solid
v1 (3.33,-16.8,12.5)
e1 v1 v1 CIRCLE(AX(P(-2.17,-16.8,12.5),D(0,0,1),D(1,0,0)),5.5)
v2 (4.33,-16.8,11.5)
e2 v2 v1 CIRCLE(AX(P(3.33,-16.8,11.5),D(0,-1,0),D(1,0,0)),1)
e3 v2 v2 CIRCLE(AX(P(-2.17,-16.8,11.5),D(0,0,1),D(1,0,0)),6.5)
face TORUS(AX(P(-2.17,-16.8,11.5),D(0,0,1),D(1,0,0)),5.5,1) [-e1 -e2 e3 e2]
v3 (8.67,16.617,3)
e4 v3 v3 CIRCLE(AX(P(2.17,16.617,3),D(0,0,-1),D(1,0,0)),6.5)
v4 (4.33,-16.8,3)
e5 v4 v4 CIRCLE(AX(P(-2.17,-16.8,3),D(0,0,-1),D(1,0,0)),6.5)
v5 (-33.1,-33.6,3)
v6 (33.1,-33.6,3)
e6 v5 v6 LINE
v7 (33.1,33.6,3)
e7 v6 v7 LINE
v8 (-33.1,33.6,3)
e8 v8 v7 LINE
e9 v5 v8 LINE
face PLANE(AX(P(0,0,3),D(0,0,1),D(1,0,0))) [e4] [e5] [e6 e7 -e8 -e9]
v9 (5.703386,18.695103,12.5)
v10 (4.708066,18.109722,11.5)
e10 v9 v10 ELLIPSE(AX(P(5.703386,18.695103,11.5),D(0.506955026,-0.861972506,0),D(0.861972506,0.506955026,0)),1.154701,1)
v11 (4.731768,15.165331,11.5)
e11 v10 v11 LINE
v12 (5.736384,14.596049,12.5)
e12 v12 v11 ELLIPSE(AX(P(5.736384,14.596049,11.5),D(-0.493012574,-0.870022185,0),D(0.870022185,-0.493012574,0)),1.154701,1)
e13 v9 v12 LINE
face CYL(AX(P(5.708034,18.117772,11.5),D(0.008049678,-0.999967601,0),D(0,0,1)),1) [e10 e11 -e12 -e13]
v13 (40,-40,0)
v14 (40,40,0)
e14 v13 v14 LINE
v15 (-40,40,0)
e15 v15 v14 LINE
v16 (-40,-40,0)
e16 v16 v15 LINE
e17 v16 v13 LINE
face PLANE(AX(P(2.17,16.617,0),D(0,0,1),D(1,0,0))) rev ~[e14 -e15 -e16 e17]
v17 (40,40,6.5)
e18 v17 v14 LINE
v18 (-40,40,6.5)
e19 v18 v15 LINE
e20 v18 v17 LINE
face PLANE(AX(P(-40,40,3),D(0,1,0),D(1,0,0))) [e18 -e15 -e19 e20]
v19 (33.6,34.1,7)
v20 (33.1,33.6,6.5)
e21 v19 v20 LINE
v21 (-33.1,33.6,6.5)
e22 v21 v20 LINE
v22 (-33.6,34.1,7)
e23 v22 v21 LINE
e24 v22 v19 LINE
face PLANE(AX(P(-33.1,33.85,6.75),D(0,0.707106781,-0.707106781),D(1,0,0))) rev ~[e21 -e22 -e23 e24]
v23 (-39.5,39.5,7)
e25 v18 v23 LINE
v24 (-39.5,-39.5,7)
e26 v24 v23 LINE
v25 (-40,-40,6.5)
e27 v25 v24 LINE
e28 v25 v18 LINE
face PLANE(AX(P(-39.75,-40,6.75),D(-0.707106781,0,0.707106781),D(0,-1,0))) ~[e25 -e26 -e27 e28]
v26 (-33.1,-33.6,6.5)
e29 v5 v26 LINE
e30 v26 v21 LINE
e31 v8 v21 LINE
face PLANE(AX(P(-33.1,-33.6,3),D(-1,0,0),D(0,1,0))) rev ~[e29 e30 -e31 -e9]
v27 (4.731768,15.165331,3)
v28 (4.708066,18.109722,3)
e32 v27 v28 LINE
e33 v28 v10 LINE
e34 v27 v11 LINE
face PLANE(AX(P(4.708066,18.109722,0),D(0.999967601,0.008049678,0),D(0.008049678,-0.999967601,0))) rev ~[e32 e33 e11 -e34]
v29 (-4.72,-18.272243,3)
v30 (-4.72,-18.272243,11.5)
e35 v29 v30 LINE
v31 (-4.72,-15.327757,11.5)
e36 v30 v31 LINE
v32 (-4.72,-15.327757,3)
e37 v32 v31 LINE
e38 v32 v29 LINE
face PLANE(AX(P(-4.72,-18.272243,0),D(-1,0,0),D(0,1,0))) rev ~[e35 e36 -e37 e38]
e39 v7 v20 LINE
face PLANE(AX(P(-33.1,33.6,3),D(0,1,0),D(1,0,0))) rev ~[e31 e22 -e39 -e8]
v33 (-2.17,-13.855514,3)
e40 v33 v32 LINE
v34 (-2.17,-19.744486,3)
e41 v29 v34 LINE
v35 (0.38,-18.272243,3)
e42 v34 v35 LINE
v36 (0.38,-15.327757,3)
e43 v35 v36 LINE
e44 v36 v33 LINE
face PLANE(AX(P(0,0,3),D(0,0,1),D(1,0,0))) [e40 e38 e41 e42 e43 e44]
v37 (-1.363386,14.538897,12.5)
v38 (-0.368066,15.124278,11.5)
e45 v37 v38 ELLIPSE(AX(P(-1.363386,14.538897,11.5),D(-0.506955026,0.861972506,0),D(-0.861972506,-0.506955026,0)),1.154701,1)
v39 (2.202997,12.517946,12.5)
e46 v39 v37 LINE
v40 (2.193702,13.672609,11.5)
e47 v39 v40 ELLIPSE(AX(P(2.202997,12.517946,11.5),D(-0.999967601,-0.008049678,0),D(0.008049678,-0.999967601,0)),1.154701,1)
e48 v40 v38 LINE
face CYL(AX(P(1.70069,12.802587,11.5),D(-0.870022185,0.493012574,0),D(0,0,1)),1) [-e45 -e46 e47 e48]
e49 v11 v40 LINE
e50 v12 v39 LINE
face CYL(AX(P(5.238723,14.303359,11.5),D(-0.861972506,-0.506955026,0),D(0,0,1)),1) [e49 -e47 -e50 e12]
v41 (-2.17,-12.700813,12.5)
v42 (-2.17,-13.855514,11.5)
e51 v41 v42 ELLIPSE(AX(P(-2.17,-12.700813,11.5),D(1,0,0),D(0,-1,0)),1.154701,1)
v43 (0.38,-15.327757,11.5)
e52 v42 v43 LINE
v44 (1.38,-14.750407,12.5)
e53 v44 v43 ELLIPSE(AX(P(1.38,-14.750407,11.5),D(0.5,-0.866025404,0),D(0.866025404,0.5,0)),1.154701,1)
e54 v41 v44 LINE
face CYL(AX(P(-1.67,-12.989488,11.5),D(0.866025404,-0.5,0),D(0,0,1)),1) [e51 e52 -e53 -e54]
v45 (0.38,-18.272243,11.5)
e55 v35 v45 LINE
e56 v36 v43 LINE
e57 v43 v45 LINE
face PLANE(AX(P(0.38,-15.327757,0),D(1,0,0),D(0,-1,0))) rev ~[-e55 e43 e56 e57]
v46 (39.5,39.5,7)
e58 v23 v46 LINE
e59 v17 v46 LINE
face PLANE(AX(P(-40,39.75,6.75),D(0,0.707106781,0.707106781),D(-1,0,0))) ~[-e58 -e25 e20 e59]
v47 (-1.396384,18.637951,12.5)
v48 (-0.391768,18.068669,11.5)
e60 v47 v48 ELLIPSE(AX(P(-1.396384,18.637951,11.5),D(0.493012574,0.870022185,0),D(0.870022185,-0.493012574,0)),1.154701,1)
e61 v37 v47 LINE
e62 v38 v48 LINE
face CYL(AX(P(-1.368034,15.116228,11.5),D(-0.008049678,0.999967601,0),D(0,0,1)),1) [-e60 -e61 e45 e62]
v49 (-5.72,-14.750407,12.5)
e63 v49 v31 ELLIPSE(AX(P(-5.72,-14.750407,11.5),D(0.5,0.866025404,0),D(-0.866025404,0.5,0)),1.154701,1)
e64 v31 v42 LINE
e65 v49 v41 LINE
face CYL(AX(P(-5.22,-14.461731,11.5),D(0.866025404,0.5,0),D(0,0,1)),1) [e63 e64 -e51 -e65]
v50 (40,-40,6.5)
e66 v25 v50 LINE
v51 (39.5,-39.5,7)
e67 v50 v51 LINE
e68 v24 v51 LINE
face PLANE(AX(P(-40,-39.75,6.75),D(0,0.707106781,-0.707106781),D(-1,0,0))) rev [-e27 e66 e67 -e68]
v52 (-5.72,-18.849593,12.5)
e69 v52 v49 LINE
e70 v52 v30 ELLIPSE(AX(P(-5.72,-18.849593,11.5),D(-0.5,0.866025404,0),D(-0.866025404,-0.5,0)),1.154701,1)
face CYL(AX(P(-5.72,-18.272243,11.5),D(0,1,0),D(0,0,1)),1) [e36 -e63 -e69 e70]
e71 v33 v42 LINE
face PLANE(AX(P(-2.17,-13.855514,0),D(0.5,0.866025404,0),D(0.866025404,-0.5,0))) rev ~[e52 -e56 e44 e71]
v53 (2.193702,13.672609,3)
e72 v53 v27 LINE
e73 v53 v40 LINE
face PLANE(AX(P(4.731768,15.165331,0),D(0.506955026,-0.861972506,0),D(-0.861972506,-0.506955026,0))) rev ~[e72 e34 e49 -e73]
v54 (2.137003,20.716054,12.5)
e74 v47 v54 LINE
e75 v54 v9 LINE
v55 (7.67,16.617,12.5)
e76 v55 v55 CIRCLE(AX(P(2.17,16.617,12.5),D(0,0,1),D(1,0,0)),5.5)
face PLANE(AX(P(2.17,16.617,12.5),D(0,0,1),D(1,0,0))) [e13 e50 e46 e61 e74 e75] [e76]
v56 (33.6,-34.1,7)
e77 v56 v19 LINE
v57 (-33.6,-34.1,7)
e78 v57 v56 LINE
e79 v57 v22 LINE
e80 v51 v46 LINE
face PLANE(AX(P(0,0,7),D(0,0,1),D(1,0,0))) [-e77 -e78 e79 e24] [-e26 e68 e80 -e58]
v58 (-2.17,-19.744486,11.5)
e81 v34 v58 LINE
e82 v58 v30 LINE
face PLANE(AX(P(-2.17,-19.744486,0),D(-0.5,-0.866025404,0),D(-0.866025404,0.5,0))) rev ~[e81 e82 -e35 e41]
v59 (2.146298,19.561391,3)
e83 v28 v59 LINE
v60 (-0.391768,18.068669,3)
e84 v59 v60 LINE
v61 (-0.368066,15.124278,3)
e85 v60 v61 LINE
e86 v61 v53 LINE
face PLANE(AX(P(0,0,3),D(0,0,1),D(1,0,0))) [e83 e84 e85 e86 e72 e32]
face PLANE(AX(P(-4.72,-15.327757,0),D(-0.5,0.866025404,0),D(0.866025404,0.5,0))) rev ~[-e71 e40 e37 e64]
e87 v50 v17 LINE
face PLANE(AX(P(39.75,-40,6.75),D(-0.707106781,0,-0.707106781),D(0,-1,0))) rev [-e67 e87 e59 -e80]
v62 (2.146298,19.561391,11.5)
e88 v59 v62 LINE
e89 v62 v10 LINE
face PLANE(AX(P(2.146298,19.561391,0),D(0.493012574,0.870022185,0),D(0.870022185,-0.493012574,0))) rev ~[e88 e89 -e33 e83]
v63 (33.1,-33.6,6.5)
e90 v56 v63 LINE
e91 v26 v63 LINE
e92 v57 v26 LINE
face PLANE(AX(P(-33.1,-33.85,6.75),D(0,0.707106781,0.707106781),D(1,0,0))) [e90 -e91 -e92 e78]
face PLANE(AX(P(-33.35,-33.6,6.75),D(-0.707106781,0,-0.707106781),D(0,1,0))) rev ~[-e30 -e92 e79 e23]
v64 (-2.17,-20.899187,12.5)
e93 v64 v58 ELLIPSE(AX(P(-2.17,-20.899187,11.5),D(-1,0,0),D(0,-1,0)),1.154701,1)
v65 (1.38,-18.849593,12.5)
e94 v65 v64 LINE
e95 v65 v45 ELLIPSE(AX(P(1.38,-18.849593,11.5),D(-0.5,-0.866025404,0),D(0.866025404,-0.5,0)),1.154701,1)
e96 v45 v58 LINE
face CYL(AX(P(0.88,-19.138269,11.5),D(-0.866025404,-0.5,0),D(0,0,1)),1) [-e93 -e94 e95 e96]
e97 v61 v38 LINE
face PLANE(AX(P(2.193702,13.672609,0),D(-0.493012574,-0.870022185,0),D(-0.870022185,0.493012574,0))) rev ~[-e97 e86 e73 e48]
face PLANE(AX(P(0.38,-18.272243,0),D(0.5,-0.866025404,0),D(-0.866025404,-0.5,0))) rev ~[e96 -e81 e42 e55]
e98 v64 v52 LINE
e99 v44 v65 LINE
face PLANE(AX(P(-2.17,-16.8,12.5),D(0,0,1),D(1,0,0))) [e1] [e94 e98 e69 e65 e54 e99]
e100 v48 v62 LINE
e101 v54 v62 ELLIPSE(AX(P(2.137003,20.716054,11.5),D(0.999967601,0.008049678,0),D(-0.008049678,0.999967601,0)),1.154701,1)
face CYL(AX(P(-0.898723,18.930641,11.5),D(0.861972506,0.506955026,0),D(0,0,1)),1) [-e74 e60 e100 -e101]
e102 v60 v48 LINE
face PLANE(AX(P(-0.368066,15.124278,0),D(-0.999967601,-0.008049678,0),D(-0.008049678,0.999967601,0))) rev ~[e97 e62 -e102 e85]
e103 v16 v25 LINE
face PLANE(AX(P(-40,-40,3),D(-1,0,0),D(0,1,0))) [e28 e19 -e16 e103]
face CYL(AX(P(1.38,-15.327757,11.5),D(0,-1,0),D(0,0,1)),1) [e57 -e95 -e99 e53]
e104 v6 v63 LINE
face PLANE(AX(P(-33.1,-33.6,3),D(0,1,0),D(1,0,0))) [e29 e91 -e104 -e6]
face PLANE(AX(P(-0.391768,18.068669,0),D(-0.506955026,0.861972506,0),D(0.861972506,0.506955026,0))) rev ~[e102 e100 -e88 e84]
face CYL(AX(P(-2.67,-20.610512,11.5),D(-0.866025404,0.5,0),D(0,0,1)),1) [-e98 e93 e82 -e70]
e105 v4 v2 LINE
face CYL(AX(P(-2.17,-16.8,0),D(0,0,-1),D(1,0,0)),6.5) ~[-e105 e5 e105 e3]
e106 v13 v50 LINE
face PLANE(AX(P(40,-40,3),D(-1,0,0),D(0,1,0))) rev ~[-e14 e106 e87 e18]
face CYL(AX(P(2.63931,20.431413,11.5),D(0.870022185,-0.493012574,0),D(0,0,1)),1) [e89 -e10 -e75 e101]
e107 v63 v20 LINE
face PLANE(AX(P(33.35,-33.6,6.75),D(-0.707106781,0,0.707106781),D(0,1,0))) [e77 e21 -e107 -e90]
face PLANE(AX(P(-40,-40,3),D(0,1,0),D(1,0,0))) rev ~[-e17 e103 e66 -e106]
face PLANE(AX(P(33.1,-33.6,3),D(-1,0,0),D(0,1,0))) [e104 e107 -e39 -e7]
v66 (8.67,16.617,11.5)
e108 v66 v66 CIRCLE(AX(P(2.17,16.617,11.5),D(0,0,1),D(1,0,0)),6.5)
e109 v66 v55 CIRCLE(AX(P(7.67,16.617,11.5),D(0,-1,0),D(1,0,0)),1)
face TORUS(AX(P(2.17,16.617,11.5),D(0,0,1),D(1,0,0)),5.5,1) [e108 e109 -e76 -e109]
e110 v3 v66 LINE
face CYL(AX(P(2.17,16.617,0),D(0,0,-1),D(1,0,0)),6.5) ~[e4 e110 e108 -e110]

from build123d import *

# Parameters (mm, degrees)
F0_W     = 80
F0_H     = 80
F0_R     = 6.5
F1_DEPTH = 3
F2_DEPTH = 12.5
F3_R     = 1
F4_W     = 80
F4_H     = 80
F4_W_2   = 66.2
F4_H_2   = 67.2
F5_DEPTH = 4
F6_SIZE  = 0.5


# Not quite as in the source:
# - a feature names something its author has since deleted; it is built from what else it names


with BuildPart() as f1:
    # F0 (on Top) → F1 (new body)
    with BuildSketch(Plane.XY):
        Rectangle(F0_W, F0_H)
        with Locations((-2.17, -16.8)):
            Circle(F0_R, mode=Mode.SUBTRACT)
        with Locations((2.17, 16.617)):
            Circle(F0_R, mode=Mode.SUBTRACT)
        with Locations((2.17, 16.617)):
            Circle(F0_R)
        Polygon((-0.3917684664, 18.0686688068), (2.1462978314, 19.5613909739), (4.7080662978, 18.1097221671), (4.7317684664, 15.1653311932), (2.1937021686, 13.6726090261), (-0.3680662978, 15.1242778329), align=None, mode=Mode.SUBTRACT)
        Polygon((4.7080662978, 18.1097221671), (2.1462978314, 19.5613909739), (-0.3917684664, 18.0686688068), (-0.3680662978, 15.1242778329), (2.1937021686, 13.6726090261), (4.7317684664, 15.1653311932), align=None)
        with Locations((-2.17, -16.8)):
            Circle(F0_R)
        Polygon((-2.17, -13.8555136271), (0.38, -15.3277568136), (0.38, -18.2722431864), (-2.17, -19.7444863729), (-4.72, -18.2722431864), (-4.72, -15.3277568136), align=None, mode=Mode.SUBTRACT)
        Polygon((0.38, -18.2722431864), (0.38, -15.3277568136), (-2.17, -13.8555136271), (-4.72, -15.3277568136), (-4.72, -18.2722431864), (-2.17, -19.7444863729), align=None)
    extrude(amount=F1_DEPTH)

    # F0 (on Top) → F2 (join)
    with BuildSketch(Plane.XY):
        with Locations((2.17, 16.617)):
            Circle(F0_R)
        Polygon((-0.3917684664, 18.0686688068), (2.1462978314, 19.5613909739), (4.7080662978, 18.1097221671), (4.7317684664, 15.1653311932), (2.1937021686, 13.6726090261), (-0.3680662978, 15.1242778329), align=None, mode=Mode.SUBTRACT)
        with Locations((-2.17, -16.8)):
            Circle(F0_R)
        Polygon((-2.17, -13.8555136271), (0.38, -15.3277568136), (0.38, -18.2722431864), (-2.17, -19.7444863729), (-4.72, -18.2722431864), (-4.72, -15.3277568136), align=None, mode=Mode.SUBTRACT)
    extrude(amount=F2_DEPTH)

    # F3
    f3_edges = [f1.edges().sort_by_distance(p)[0] for p in [
        (-4.33, 16.617, 12.5),
        (0.877265, 18.81503, 12.5),
        (3.427182, 18.835557, 12.5),
        (4.719917, 16.637527, 12.5),
        (3.462735, 14.41897, 12.5),
        (0.912818, 14.398443, 12.5),
        (-0.379917, 16.596473, 12.5),
        (-8.67, -16.8, 12.5),
        (-0.895, -14.591635, 12.5),
        (0.38, -16.8, 12.5),
        (-0.895, -19.008365, 12.5),
        (-3.445, -19.008365, 12.5),
        (-4.72, -16.8, 12.5),
        (-3.445, -14.591635, 12.5),
    ]]
    fillet(f3_edges, radius=F3_R)

    # F4 (on face) → F5 (join)
    with BuildSketch(Plane.XY.offset(3)):
        Rectangle(F4_W, F4_H)
        Rectangle(F4_W_2, F4_H_2, mode=Mode.SUBTRACT)
    extrude(amount=F5_DEPTH)

    # F6
    f6_edges = [f1.edges().sort_by_distance(p)[0] for p in [
        (0, -40, 7),
        (40, 0, 7),
        (0, 40, 7),
        (-40, 0, 7),
        (0, 33.6, 7),
        (33.1, 0, 7),
        (0, -33.6, 7),
        (-33.1, 0, 7),
    ]]
    chamfer(f6_edges, length=F6_SIZE)


solid = f1.part
